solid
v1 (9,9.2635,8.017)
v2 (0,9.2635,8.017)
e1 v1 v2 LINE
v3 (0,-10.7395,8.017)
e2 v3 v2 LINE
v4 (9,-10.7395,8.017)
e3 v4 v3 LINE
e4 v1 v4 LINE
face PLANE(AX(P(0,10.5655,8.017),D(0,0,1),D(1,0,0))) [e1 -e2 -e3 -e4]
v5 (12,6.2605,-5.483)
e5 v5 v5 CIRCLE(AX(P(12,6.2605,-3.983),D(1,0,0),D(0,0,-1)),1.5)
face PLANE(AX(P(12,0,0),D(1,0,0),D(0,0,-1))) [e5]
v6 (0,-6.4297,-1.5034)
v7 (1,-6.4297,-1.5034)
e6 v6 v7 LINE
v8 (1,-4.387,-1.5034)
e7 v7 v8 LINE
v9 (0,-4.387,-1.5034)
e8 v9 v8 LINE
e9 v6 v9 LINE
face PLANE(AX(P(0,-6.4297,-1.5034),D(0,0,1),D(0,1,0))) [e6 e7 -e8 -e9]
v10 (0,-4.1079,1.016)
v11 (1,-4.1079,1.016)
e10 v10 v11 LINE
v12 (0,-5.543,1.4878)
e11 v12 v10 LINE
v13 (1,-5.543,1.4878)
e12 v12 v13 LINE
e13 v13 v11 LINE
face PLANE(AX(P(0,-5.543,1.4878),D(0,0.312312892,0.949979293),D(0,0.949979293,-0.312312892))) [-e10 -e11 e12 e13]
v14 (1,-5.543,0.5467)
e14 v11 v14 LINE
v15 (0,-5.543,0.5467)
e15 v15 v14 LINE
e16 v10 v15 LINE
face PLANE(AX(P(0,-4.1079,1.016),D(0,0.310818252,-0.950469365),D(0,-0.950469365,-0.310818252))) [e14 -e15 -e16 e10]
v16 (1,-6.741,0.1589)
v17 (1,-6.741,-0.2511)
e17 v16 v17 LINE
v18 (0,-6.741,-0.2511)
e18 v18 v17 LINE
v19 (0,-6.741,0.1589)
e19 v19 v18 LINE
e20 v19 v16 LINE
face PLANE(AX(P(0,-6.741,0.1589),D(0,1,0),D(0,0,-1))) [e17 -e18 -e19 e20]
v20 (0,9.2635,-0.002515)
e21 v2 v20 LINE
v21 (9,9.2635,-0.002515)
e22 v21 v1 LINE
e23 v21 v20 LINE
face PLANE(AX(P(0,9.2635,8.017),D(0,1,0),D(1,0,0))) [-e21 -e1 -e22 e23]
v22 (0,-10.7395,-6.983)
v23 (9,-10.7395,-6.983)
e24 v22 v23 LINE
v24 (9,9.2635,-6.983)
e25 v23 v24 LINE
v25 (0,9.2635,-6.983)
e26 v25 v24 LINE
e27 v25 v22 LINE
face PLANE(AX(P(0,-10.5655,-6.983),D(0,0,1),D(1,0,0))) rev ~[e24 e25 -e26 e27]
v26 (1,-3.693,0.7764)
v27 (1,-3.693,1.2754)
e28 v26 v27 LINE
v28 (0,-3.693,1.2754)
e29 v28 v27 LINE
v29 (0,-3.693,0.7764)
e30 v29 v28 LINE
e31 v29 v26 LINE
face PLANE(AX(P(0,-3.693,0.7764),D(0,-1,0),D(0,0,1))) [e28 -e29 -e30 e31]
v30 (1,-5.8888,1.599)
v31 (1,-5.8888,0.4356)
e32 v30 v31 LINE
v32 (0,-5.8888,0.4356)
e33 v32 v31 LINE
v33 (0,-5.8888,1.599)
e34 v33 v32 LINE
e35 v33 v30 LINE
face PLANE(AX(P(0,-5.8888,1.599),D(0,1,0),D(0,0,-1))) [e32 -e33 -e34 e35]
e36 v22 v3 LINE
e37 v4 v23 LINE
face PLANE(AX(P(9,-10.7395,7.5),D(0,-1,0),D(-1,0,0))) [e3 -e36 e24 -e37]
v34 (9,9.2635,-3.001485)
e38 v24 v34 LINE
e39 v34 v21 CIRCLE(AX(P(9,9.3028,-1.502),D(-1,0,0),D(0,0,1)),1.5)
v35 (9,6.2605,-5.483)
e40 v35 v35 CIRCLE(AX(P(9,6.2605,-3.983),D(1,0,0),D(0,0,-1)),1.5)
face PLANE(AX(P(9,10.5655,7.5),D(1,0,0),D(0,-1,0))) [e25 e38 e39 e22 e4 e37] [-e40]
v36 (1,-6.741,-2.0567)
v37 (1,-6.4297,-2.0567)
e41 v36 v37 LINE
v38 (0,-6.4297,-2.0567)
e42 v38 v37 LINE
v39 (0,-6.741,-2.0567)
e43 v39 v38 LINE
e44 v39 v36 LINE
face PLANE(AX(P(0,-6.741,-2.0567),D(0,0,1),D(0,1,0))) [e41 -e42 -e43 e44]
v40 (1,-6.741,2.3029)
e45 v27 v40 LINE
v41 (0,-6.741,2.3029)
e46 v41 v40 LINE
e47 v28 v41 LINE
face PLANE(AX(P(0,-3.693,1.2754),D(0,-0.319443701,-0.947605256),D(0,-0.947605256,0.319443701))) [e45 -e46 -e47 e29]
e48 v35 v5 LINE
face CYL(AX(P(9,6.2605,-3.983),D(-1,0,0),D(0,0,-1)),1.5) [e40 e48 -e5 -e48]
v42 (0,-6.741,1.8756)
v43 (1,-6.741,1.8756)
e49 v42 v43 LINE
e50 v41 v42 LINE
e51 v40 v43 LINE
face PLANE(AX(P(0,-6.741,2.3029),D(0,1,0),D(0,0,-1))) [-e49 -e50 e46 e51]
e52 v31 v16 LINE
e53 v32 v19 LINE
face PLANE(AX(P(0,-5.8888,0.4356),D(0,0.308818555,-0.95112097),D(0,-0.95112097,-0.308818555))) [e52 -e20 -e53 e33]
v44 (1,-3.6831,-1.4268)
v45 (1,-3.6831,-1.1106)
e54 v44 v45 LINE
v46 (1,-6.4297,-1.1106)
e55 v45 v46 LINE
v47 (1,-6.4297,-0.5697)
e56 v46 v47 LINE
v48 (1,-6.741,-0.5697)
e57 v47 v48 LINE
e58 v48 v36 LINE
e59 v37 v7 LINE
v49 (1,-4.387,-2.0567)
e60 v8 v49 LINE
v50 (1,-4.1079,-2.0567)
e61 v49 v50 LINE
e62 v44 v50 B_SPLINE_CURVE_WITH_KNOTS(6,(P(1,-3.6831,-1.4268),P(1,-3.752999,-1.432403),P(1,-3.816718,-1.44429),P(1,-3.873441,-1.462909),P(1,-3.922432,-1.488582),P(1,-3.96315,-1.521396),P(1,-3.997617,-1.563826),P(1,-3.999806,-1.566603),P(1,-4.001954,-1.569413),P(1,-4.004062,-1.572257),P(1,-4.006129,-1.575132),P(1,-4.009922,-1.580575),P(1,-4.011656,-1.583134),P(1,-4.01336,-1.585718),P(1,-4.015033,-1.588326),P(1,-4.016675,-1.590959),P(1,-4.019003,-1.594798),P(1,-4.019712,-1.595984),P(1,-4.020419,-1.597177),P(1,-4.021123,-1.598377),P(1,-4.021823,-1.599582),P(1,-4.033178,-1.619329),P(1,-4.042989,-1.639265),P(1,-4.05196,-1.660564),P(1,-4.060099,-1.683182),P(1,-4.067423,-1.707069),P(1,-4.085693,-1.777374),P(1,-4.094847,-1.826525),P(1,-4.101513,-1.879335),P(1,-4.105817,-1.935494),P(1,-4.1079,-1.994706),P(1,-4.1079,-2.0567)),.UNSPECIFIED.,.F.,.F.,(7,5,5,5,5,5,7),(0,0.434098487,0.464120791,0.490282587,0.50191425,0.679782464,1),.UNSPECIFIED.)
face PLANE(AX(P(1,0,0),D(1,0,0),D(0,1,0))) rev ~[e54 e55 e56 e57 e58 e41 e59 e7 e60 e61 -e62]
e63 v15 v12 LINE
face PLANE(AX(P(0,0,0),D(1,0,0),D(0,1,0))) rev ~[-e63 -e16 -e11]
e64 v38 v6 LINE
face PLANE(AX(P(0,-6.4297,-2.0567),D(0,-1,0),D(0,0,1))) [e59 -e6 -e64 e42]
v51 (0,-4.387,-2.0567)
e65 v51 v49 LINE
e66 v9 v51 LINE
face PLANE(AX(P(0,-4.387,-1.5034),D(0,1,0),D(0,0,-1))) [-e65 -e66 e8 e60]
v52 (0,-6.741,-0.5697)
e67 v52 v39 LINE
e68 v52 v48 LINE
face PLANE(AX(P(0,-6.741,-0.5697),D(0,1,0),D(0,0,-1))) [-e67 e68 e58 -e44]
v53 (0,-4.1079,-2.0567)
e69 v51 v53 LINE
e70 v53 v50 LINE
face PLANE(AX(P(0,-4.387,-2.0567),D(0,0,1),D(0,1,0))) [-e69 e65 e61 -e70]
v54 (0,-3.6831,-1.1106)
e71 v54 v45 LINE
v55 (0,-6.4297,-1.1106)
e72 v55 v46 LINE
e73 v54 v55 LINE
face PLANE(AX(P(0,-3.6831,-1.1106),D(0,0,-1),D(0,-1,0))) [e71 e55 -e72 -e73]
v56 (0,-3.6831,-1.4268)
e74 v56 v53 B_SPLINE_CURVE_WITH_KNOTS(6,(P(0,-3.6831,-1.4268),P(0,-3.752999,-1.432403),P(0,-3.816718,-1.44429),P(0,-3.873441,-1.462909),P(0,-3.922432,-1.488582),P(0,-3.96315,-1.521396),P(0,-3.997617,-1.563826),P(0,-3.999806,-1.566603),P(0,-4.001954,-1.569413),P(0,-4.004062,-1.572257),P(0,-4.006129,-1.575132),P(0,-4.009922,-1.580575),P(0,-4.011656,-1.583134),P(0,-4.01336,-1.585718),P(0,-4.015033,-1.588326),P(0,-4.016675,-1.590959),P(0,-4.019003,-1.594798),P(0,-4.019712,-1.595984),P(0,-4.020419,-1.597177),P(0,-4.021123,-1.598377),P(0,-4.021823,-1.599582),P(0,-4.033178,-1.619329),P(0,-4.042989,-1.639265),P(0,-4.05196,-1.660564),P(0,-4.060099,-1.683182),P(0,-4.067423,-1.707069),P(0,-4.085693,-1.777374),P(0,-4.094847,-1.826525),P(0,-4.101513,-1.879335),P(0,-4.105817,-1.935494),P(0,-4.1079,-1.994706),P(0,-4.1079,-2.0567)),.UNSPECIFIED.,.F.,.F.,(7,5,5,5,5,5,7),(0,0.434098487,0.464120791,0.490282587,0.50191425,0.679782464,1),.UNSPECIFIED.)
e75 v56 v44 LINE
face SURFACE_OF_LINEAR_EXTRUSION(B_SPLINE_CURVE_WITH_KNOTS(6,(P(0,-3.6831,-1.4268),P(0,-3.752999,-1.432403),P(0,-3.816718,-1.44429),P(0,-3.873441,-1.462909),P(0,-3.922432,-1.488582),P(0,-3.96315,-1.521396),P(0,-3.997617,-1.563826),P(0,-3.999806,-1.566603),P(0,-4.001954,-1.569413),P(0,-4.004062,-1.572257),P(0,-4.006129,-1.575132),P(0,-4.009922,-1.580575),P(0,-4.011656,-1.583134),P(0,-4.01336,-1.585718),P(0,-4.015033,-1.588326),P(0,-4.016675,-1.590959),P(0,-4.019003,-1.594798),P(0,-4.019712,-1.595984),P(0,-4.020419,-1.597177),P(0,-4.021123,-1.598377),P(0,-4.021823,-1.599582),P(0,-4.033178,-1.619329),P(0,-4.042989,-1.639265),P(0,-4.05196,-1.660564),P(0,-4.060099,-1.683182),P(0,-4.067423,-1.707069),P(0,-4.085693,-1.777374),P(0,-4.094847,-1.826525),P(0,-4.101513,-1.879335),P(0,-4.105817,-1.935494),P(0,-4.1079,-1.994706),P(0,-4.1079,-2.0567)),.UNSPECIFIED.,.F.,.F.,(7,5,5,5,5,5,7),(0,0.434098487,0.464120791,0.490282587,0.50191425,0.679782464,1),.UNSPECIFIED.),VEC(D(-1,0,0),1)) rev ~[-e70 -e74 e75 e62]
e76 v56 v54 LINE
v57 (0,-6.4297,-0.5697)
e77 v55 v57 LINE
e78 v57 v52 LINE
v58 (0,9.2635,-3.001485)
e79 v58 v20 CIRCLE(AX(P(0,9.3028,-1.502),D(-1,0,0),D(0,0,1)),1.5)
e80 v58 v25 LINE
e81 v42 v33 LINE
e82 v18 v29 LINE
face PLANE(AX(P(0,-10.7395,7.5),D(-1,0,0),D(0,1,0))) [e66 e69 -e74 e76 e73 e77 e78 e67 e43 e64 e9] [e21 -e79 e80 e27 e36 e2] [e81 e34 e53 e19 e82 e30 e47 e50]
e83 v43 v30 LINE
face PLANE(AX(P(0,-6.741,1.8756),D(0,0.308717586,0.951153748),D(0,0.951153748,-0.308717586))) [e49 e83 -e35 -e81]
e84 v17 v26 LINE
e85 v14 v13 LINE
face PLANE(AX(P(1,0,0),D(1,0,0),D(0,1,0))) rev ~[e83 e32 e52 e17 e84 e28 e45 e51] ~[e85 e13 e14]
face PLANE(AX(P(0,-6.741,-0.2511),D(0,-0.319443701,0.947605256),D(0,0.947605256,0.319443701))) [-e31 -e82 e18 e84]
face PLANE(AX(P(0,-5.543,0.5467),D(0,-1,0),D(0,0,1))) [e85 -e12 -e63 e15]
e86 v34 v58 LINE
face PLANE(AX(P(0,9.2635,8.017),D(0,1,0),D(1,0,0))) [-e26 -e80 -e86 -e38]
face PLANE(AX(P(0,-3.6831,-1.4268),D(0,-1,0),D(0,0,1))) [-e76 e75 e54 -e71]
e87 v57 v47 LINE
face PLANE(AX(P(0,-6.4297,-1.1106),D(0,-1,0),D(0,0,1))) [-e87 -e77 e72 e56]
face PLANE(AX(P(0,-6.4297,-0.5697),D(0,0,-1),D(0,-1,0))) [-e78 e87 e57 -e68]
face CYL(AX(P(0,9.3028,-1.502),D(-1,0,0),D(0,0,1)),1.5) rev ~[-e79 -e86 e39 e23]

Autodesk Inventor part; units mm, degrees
ref_plane "YZ Plane" through (0, 0, 0) normal (1, 0, 0) x (0, 1, 0)
ref_plane "XZ Plane" through (0, 0, 0) normal (0, 1, 0) x (-1, 0, 0)
ref_plane "XY Plane" through (0, 0, 0) normal (0, 0, 1) x (1, 0, 0)
sketch "Sketch1" plane through (0, 0, 0) normal (1, 0, 0) x (0, 1, 0)
  line L0 (10.5655, 7.5) -> (-10.5655, 7.5)
  line L1 (-10.5655, 7.5) -> (-10.5655, -6.983)
  line L2 (-10.5655, -6.983) -> (10.5655, -6.983)
  line L3 (10.5655, -6.983) -> (10.5655, 7.5)
  point P0 (0, 0)
  dimension "d0" = 21.131
  dimension "d2" = 10.5655
  dimension "d3" = 7.5
  dimension "d27" = 14.483
extrude "Extrusion1" add sketch "Sketch1" along normal blind 9
sketch "Sketch3" plane through (9, 0, 0) normal (1, 0, 0) x (0, 0, -1)
  circle A0 centre (3.983, 6.2605) radius 1.5
  point P0 (0, 0)
  dimension "d12" = 3
extrude "Extrusion3" add sketch "Sketch3" along normal blind 3
sketch "Sketch4" plane through (0, 0, 0) normal (-1, 0, 0) x (0, 0, 1)
  line L0 (-2.5186, -3.6831) -> (10.3419, -3.6831) construction
  line L1 (10.3419, -3.6831) -> (10.3419, -8.8157) construction
  line L2 (10.3419, -8.8157) -> (-2.5186, -8.8157) construction
  line L3 (-2.5186, -8.8157) -> (-2.5186, -3.6831) construction
  line L4 (-0.5697, -6.741) -> (-2.0567, -6.741)
  line L5 (-2.0567, -6.741) -> (-2.0567, -6.4297)
  line L6 (-2.0567, -6.4297) -> (-1.5034, -6.4297)
  line L7 (-1.5034, -6.4297) -> (-1.5034, -4.387)
  line L8 (-1.5034, -4.387) -> (-2.0567, -4.387)
  line L9 (-2.0567, -4.387) -> (-2.0567, -4.1079)
  spline S0 degree 2 poles (-2.0567, -4.1079) (-1.743, -4.1079) (-1.4466, -3.9301) (-1.4268, -3.6831) knots 0 0 0 1 2 2 2
  line L10 (-1.4268, -3.6831) -> (-1.1106, -3.6831)
  line L11 (-1.1106, -3.6831) -> (-1.1106, -6.4297)
  line L12 (-1.1106, -6.4297) -> (-0.5697, -6.4297)
  line L13 (-0.5697, -6.4297) -> (-0.5697, -6.741)
  line L14 (-0.2511, -6.741) -> (0.7764, -3.693)
  line L15 (0.7764, -3.693) -> (1.2754, -3.693)
  line L16 (1.2754, -3.693) -> (2.3029, -6.741)
  line L17 (2.3029, -6.741) -> (1.8756, -6.741)
  line L18 (1.8756, -6.741) -> (1.599, -5.8888)
  line L19 (1.599, -5.8888) -> (0.4356, -5.8888)
  line L20 (0.4356, -5.8888) -> (0.1589, -6.741)
  line L21 (0.1589, -6.741) -> (-0.2511, -6.741)
  line L22 (1.4878, -5.543) -> (1.016, -4.1079)
  line L23 (1.016, -4.1079) -> (0.5467, -5.543)
  line L24 (0.5467, -5.543) -> (1.4878, -5.543)
  point P0 (0, 0)
emboss "Emboss1" sketch "Sketch4" operation cut depth 1 direction (1, 0, 0)
sketch "Sketch6" plane through (0, -10.5655, -6.983) normal (0, -1, 0) x (1, 0, 0)
  line L0 (0, 14.483) -> (0, 0) projected
  line L1 (9, 14.483) -> (9, 0) projected
  line L2 (0, 0) -> (9, 0)
  line L3 (9, 0) -> (9, 14.483)
  line L4 (9, 14.483) -> (0, 14.483)
  line L5 (0, 14.483) -> (0, 0)
  point P0 (0, 6.983)
extrude "Extrusion5" add sketch "Sketch6" along normal blind 0.174
sketch "Sketch7" plane through (0, 10.5655, 7.5) normal (0, 0, 1) x (1, 0, 0)
  line L0 (0, 0) -> (9, 0) projected
  line L1 (9, 0) -> (9, -21.305) projected
  line L2 (0, 0) -> (9, 0)
  line L3 (9, 0) -> (9, -21.305)
  line L4 (9, -21.305) -> (0, -21.305)
  line L5 (0, -21.305) -> (0, 0)
  point P0 (0, -10.5655)
extrude "Extrusion6" add sketch "Sketch7" along normal blind 0.517
sketch "Sketch10" plane through (0, 10.5655, 8.017) normal (0, 1, 0) x (1, 0, 0)
  line L0 (0, 15) -> (9, 15) projected
  line L1 (9, 15) -> (9, 0) projected
  line L2 (0, 15) -> (9, 15)
  line L3 (9, 15) -> (9, 0)
  line L4 (9, 0) -> (0, 0)
  line L5 (0, 0) -> (0, 15)
  point P0 (0, 8.017)
  point P1 (9, 8.019)
  point P2 (9, 8.019)
extrude "Extrusion9" cut sketch "Sketch10" against normal blind 1.302
sketch "Sketch11" plane through (0, 0, 0) normal (-1, 0, 0) x (0, 0, 1)
  circle A0 centre (-1.502, 9.3028) radius 1.5
  line L0 (8.017, 9.2635) -> (8.017, -10.7395) projected
  point P0 (0, 0)
  dimension "d40" = 3
  dimension "d41" = 9.519
extrude "Extrusion10" cut sketch "Sketch11" against normal up to surface (9 mm away)
equation "\"d2\" = 0.5 * d0"
properties part number "Support_1A"
